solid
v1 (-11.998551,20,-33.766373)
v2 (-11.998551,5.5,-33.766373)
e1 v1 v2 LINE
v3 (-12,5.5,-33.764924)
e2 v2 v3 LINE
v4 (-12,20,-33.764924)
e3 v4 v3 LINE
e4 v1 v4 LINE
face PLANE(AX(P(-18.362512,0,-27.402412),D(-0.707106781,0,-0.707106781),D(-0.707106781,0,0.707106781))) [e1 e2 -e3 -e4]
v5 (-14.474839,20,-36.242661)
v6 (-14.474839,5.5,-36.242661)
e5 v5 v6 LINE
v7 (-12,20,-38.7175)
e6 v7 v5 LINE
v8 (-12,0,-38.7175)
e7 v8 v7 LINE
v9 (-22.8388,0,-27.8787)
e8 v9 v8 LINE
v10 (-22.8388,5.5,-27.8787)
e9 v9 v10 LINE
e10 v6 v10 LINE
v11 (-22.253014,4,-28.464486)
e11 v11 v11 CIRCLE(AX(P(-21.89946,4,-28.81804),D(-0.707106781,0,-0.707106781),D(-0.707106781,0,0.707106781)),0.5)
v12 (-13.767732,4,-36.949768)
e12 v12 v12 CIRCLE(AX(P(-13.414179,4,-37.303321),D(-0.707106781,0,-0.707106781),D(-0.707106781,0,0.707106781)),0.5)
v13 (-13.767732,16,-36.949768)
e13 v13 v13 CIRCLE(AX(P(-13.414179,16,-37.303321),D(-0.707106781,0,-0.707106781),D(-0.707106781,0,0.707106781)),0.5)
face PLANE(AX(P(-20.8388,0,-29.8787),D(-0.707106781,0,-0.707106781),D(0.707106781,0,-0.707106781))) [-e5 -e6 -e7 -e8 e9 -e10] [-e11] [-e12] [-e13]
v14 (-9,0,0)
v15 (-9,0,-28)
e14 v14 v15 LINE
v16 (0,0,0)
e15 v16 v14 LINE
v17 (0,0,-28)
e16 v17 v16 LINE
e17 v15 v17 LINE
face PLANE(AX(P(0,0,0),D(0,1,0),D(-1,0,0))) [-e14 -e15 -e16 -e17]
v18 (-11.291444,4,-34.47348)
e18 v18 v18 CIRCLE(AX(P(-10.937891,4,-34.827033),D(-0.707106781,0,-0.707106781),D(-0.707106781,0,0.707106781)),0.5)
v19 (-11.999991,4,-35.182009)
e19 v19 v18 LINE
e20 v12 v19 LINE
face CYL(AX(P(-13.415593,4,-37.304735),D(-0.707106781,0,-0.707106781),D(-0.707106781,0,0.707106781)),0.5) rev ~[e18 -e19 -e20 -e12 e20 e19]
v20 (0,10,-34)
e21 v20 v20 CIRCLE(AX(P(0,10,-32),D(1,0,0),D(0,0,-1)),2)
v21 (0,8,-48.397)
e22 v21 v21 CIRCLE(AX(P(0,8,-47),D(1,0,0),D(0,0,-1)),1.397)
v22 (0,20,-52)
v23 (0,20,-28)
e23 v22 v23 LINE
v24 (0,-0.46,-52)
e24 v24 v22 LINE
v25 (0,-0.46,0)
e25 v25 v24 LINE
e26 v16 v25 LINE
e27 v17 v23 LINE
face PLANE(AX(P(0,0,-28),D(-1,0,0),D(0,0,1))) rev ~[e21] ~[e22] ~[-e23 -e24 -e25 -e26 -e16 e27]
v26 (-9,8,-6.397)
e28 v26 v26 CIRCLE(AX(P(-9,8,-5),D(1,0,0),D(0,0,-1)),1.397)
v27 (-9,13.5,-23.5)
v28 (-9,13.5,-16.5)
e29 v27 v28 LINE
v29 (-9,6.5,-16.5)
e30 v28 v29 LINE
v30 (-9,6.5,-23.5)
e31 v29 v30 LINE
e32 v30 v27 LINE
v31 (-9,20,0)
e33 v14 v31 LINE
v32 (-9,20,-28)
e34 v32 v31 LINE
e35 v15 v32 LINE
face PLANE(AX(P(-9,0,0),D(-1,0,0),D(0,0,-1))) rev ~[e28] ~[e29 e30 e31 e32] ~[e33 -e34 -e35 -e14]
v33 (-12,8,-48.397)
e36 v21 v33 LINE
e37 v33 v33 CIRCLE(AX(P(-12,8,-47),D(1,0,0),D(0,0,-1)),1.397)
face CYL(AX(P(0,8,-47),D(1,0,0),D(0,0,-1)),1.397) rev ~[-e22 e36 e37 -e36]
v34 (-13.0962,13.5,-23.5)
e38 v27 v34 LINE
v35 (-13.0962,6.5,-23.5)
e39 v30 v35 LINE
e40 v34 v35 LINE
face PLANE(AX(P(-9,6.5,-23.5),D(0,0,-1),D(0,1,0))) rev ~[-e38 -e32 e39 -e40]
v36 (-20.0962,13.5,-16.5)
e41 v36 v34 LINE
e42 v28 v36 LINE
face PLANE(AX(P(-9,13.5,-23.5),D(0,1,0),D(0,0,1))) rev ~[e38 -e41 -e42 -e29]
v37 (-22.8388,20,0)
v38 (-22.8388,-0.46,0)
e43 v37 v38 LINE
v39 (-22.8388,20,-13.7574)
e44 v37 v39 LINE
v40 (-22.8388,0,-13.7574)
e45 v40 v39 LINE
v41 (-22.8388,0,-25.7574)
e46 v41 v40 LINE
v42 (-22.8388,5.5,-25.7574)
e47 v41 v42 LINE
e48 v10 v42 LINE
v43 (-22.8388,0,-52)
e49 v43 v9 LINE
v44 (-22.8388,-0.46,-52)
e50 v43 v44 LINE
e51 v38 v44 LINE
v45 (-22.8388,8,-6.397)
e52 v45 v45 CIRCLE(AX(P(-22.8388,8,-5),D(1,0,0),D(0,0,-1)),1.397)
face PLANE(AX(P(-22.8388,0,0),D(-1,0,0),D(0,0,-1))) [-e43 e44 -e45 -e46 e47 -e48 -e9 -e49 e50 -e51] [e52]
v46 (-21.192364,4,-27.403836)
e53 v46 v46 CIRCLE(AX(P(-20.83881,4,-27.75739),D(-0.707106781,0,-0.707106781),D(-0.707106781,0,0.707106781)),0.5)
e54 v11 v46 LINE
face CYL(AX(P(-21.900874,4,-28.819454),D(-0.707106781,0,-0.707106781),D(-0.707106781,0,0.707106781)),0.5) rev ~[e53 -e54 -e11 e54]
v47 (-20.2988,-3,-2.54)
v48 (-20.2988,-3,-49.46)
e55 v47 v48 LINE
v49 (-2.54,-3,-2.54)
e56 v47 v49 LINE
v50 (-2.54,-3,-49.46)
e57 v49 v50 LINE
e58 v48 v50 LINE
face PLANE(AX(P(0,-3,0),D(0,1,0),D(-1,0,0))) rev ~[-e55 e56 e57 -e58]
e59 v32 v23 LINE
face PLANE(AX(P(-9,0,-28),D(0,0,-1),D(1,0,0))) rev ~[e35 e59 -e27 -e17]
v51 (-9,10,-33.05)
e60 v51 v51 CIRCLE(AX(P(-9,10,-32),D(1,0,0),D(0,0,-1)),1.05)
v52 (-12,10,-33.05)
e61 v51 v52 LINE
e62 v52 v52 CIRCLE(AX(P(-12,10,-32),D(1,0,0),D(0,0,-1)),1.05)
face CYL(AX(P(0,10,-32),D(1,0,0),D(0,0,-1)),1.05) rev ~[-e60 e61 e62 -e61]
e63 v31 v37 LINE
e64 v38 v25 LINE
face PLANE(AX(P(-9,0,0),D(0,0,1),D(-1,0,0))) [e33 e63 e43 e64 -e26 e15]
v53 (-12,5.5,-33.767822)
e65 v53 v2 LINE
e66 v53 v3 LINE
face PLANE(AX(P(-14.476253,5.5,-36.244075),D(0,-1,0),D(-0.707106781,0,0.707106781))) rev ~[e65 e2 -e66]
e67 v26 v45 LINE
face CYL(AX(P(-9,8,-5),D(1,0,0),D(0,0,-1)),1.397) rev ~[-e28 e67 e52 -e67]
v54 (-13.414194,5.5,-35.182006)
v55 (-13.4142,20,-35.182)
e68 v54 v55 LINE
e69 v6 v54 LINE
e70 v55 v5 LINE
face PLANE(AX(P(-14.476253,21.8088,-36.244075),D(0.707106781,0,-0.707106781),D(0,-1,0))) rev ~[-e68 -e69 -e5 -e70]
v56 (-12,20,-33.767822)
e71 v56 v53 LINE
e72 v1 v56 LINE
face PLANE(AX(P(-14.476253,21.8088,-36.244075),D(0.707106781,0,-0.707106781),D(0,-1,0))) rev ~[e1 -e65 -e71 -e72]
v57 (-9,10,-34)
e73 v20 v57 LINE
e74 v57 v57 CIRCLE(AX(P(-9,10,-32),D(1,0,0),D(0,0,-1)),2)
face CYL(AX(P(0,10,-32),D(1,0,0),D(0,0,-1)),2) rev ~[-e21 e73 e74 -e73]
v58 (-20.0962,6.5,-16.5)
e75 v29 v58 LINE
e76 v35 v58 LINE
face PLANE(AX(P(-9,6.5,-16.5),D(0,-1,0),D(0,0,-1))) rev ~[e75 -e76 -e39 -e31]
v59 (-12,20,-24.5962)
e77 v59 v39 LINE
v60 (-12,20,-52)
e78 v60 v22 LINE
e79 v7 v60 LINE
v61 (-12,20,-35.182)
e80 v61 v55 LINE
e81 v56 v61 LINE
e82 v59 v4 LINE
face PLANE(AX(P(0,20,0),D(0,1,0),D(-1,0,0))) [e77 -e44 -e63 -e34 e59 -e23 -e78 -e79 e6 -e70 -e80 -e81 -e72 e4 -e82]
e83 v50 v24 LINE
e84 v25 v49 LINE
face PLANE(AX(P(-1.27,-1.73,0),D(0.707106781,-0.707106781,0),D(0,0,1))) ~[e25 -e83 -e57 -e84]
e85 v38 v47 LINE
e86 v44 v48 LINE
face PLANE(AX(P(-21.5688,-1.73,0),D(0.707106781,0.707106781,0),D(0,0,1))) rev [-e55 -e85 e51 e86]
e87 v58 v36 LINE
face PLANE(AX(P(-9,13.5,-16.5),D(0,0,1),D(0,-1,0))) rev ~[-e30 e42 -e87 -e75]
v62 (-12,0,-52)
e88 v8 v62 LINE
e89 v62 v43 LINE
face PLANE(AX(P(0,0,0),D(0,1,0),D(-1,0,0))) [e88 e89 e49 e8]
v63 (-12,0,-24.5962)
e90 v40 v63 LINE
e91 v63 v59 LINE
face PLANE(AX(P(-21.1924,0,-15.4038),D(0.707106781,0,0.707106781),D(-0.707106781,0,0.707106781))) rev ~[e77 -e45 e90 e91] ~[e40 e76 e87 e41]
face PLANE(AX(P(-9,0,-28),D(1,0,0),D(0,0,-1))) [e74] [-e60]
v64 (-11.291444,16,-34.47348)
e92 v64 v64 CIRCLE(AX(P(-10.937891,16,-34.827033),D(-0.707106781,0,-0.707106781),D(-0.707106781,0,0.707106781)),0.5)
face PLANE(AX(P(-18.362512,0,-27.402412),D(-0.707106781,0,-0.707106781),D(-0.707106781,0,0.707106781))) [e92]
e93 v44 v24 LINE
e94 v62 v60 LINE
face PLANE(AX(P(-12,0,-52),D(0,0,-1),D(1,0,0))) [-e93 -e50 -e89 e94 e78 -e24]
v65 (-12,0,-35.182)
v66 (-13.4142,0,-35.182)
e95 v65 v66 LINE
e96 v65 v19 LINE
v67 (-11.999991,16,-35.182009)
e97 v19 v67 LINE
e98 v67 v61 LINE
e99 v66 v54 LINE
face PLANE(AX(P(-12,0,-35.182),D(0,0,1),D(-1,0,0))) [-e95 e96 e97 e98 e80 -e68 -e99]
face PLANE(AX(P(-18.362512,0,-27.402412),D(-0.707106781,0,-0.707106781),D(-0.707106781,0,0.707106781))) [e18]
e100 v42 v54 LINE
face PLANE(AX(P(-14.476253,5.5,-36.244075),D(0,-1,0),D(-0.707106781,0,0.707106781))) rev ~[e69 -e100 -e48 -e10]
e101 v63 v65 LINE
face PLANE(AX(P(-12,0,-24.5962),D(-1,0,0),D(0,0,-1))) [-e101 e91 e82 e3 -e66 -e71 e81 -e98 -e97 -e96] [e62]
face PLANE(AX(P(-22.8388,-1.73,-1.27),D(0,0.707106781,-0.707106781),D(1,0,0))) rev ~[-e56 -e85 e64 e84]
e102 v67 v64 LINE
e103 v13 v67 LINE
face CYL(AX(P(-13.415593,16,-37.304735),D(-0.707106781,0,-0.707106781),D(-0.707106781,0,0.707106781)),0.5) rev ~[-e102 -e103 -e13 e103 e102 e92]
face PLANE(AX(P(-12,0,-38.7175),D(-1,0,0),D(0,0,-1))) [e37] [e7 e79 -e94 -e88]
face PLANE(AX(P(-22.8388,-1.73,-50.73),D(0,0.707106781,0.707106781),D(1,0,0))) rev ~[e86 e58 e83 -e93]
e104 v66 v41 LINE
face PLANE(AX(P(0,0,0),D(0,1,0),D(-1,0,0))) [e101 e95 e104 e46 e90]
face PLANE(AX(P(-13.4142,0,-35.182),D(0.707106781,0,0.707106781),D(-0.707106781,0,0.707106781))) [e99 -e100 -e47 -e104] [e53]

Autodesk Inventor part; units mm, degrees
ref_plane "YZ Plane" through (0, 0, 0) normal (1, 0, 0) x (0, 1, 0)
ref_plane "XZ Plane" through (0, 0, 0) normal (0, 1, 0) x (-1, 0, 0)
ref_plane "XY Plane" through (0, 0, 0) normal (0, 0, 1) x (1, 0, 0)
sketch "Sketch1" plane through (0, 0, 0) normal (0, 1, 0) x (-1, 0, 0)
  line L0 (0, 0) -> (22.8388, 0)
  line L1 (22.8388, 0) -> (22.8388, -52)
  line L2 (22.8388, -52) -> (0, -52)
  line L3 (0, -52) -> (0, 0)
  line L4 (9, 0) -> (9, -16.4645)
  line L5 (12, -24.5962) -> (12, -35.182)
  line L6 (9, -28) -> (0, -28)
  line L7 (12, -35.182) -> (13.4142, -35.182)
  line L8 (13.4142, -35.182) -> (19.7782, -28.818)
  line L9 (19.7782, -28.818) -> (20.8388, -29.8787)
  line L10 (20.8388, -29.8787) -> (12, -38.7175)
  line L11 (12, -38.7175) -> (12, -52)
  line L12 (16.5962, -32) -> (17.6569, -33.0607) construction
  line L13 (16.5962, -32) -> (0, -32) construction
  line L14 (9, -16.4645) -> (9, -28)
  line L15 (20.8388, -29.8787) -> (19.7782, -28.818)
  line L16 (12, -24.5962) -> (21.1924, -15.4038)
  line L17 (16.5962, -32) -> (16.5962, -20) construction
  line L18 (16.5962, -20) -> (9, -20) construction
  line L19 (21.1924, -15.4038) -> (22.8388, -13.7574)
  line L20 (20.8388, -29.8787) -> (22.8388, -27.8787)
  line L21 (19.7782, -28.818) -> (22.8388, -25.7574)
  dimension "d8" = 9
  dimension "d9" = 1.5
  dimension "d10" = 8
  dimension "d11" = 20
  dimension "d12" = 12
  dimension "d18" = 28
  dimension "d46" = 45
  dimension "d48" = 3
  dimension "d49" = 45
  dimension "d50" = 2
  dimension "d51" = 4
  dimension "d52" = 20
extrude "Extrusion2" add sketch "Sketch1" along normal blind 20 contours L0 L1 L19 L16 L5 L7 L8 L9 L10 L11 L2 L3 L6 L14 L4 | L1 L20 L9 L21
sketch "Sketch3" plane through (-9, 0, 0) normal (1, 0, 0) x (0, 0, -1)
  line L0 (0, 0) -> (0, 20) projected
  line L1 (23.5, 13.5) -> (16.5, 13.5)
  line L2 (16.5, 13.5) -> (16.5, 6.5)
  line L3 (16.5, 6.5) -> (23.5, 6.5)
  line L4 (23.5, 6.5) -> (23.5, 13.5)
  circle A0 centre (5, 8) radius 1.397
  point P0 (16.5, 10)
  point P1 (16.5, 10)
  point P2 (0, 10)
  point P3 (20, 0)
  point P4 (20, 0)
  point P5 (20, 0)
  point P6 (20, 6.5)
  point P7 (0, 10)
  dimension "d19" = 2.794
  dimension "d20" = 5
  dimension "d33" = 2
  dimension "d53" = 7
extrude "Extrusion3" cut sketch "Sketch3" against normal up to next
sketch "Sketch4" plane through (0, 0, -28) normal (1, 0, 0) x (0, 0, -1)
  line L0 (24, 0) -> (24, 20) projected
  circle A0 centre (19, 8) radius 1.397
  circle A1 centre (4, 10) radius 2
  circle A2 centre (4, 10) radius 1.05
  point P0 (-28, 0)
  point P1 (24, 10)
  point P2 (24, 10)
  dimension "d23" = 2.794
  dimension "d24" = 4
  dimension "d25" = 2.1
  dimension "d26" = 5
  dimension "d27" = 2
  dimension "d28" = 20
extrude "Extrusion4" cut sketch "Sketch4" against normal up to next contours A0 | A2
extrude "Extrusion5" cut sketch "Sketch4" against normal blind 9 contours A1
sketch "Sketch5" plane through (-20.8388, 0, -29.8787) normal (-0.7071068, 0, -0.7071068) x (-0.7071068, 0, 0.7071068)
  ellipse E0 centre (-7.75, 10) end of major axis (-7.75, 11.05) minor radius 0.7425 projected
  line L0 (-10.5, 4) -> (1.5, 4) construction
  line L1 (1.5, 4) -> (1.5, 16) construction
  line L2 (1.5, 16) -> (-10.5, 16) construction
  line L3 (-10.5, 16) -> (-10.5, 4) construction
  circle A0 centre (-10.5, 16) radius 0.5
  circle A1 centre (-10.5, 4) radius 0.5
  line L4 (-9, 5.5) -> (5.0245, 5.5)
  line L5 (5.0245, 5.5) -> (5.0245, 21.8088)
  line L6 (5.0245, 21.8088) -> (-9, 21.8088)
  line L7 (-9, 21.8088) -> (-9, 5.5)
  circle A2 centre (1.5, 4) radius 0.5
  point P0 (6.3921, 0)
  point P1 (-4.5, 0)
  point P2 (-4.5, 0)
  point P3 (-4.5, 0)
  point P4 (-10.5, 10)
  point P5 (-4.5, 4)
  point P6 (-4.5, 10)
  dimension "d35" = 12
  dimension "d37" = 1
  dimension "d40" = 4.5
  dimension "d41" = 4.5
extrude "Extrusion6" cut sketch "Sketch5" against normal blind 3.5 contours E0 | A0 | A1 | L7 L6 L5 L4 | A2
extrude "Extrusion1" add sketch "Sketch1" against normal blind 3
chamfer "Chamfer1" distance 2.54 angle 45 4 edges at (-22.8388, -3, -26) (-11.4194, -3, -52) (-11.4194, -3, 0) (0, -3, -26)
properties part number "minimal micro scanner"
